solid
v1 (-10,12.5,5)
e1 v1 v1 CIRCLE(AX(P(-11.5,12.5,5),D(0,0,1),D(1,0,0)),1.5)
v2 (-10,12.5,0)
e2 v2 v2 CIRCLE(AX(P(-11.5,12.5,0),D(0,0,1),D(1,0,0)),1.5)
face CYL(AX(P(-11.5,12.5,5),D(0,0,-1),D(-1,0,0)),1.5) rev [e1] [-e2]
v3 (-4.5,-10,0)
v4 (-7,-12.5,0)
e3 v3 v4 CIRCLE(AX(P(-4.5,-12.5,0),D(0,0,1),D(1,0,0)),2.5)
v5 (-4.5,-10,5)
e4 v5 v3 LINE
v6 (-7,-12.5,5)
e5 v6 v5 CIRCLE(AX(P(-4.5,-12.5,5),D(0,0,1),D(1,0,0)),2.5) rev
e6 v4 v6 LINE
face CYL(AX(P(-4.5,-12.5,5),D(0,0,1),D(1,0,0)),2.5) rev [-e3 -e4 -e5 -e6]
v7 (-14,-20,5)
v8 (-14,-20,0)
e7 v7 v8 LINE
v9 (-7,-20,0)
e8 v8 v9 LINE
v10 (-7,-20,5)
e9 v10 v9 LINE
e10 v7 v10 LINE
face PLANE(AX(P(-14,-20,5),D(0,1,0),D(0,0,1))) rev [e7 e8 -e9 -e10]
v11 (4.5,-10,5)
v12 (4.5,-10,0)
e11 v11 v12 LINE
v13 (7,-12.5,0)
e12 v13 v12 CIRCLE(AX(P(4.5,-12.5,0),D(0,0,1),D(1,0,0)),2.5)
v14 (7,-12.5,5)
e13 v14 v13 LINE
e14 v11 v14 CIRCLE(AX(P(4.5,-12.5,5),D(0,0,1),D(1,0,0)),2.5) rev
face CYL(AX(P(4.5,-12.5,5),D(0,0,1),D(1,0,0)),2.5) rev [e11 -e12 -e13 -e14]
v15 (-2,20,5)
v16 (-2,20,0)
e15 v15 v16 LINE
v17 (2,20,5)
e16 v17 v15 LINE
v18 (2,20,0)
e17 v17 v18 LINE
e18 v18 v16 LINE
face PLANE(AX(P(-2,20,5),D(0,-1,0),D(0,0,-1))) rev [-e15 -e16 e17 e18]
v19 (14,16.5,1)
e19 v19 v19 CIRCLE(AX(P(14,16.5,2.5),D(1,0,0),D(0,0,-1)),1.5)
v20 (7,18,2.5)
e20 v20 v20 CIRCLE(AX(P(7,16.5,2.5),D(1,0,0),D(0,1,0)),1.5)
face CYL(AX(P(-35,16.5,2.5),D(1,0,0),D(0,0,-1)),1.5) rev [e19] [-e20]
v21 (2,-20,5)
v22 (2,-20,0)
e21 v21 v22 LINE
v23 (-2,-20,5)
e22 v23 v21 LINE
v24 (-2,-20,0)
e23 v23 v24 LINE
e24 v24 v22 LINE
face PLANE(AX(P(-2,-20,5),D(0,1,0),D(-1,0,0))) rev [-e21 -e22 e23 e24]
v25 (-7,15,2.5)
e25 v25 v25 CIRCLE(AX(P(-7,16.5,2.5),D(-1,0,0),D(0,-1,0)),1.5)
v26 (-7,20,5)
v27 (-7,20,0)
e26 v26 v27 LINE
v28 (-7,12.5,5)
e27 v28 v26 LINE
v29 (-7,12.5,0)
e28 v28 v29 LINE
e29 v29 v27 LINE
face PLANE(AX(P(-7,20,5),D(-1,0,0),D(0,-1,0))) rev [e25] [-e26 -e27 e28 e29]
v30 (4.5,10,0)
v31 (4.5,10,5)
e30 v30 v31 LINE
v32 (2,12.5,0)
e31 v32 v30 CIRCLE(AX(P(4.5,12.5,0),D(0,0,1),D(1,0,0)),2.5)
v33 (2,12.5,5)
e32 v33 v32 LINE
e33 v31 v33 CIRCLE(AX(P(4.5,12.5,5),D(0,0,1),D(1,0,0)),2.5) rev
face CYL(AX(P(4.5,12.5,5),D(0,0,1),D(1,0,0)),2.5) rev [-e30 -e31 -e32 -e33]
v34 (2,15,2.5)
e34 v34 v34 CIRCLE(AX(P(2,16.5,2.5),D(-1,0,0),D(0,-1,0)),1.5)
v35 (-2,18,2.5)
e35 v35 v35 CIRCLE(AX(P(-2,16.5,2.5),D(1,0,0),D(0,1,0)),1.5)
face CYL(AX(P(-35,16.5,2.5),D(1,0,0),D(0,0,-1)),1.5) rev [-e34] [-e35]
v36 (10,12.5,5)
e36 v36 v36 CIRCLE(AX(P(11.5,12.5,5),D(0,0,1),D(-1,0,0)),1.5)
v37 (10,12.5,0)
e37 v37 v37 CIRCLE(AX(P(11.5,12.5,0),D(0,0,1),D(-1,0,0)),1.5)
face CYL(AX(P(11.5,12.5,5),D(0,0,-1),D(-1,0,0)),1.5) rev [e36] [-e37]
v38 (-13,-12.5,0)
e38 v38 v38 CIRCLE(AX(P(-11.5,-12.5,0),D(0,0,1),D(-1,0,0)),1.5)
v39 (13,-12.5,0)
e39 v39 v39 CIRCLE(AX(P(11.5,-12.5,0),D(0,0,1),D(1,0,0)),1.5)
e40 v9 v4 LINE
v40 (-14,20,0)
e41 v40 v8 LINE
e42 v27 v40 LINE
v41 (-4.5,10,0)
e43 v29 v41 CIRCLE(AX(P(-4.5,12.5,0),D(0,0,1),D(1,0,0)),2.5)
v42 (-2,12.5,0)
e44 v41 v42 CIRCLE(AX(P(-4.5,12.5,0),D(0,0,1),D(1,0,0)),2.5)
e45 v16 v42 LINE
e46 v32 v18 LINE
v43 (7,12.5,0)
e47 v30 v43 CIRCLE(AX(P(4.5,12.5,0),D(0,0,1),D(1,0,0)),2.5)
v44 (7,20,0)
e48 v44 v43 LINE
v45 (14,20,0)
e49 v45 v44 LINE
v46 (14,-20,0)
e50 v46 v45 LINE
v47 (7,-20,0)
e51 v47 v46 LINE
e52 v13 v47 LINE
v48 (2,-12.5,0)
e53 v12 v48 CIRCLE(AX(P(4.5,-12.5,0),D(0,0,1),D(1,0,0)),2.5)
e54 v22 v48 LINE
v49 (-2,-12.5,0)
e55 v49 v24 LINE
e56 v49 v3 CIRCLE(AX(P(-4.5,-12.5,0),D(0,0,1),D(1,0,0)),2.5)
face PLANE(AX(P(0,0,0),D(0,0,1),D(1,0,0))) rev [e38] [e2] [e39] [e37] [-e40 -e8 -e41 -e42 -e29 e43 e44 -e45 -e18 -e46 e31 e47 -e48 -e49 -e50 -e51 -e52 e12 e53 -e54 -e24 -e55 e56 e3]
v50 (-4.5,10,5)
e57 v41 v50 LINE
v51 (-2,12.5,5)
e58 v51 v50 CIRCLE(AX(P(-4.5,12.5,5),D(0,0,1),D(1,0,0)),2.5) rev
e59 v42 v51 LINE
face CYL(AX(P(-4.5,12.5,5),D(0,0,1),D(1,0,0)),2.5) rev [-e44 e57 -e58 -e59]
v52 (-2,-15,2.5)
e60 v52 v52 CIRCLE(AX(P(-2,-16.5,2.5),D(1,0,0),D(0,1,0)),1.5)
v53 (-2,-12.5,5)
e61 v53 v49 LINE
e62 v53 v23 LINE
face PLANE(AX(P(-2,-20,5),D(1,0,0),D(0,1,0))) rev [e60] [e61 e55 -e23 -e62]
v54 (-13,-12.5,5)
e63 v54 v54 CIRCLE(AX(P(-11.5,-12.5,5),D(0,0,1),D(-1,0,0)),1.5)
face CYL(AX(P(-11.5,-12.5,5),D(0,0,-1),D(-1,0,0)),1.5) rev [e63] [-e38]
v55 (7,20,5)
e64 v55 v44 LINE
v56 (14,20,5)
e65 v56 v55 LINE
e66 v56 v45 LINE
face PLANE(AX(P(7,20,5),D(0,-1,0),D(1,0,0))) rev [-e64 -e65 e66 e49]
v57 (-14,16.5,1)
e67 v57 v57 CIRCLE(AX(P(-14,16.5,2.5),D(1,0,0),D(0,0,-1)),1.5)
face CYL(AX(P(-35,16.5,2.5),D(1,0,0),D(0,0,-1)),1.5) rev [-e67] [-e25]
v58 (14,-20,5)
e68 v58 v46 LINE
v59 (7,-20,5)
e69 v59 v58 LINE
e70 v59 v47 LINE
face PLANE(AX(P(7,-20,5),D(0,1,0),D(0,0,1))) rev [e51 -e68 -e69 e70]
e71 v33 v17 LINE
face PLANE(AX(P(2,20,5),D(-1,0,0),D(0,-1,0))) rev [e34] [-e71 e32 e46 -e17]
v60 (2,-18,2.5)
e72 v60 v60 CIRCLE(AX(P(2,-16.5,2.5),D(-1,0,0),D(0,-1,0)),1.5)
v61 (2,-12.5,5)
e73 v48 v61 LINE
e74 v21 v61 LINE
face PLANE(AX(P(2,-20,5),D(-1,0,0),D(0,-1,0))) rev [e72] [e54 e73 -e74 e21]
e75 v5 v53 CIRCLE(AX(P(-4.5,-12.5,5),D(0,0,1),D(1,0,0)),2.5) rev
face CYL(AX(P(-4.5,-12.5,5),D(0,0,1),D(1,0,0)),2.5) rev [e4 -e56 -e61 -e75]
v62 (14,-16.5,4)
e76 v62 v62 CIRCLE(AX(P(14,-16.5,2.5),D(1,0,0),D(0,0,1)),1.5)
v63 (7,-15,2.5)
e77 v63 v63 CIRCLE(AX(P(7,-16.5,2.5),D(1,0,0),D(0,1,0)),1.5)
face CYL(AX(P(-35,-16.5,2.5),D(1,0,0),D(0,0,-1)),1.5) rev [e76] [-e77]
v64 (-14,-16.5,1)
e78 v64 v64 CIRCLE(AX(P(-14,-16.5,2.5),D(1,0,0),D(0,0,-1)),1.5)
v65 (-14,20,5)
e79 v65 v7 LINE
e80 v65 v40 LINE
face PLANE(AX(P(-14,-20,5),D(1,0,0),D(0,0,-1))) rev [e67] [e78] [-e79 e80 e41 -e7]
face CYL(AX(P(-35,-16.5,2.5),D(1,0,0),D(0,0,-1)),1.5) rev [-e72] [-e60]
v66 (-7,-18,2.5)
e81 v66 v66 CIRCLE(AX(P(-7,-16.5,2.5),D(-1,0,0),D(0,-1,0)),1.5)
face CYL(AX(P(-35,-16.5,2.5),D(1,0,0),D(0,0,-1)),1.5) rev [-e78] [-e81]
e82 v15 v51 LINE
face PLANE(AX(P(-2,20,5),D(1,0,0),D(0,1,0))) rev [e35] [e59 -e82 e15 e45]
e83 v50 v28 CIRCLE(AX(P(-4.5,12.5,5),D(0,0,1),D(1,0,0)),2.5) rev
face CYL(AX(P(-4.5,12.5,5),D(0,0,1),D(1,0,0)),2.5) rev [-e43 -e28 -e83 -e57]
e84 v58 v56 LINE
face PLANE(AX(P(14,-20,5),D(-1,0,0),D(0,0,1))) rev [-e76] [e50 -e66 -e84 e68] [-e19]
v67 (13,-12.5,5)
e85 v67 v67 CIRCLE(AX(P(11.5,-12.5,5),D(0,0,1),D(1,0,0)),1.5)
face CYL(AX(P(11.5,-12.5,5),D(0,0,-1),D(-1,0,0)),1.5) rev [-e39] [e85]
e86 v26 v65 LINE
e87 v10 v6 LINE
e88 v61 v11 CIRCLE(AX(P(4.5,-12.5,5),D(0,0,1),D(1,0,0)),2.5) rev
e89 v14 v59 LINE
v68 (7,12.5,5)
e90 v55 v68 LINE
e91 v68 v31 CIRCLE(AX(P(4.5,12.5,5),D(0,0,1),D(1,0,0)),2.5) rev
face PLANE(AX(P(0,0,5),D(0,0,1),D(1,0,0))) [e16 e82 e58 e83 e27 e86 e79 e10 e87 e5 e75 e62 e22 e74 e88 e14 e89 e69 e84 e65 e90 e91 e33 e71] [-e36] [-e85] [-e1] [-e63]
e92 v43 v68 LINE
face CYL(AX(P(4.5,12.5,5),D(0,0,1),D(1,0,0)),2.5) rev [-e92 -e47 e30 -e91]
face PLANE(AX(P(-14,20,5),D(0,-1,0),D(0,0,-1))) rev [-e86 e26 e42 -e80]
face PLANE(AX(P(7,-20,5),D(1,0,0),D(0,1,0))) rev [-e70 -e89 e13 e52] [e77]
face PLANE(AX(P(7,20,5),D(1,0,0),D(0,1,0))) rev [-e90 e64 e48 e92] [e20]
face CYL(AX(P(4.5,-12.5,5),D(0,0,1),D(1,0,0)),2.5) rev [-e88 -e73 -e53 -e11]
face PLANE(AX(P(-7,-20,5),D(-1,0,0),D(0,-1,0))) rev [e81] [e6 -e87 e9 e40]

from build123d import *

# Parameters (mm, degrees)
SKETCH_1_R          = 1.5
EXTRUDE_1_DEPTH     = 5
FILLET_1_R          = 2.5
SKETCH_3_R          = 1.5
CUT_EXTRUDE_1_DEPTH = 49


with BuildPart() as part:
    # 草图1 → 凸台-拉伸1 (new body)
    with BuildSketch(Plane.XY):
        Polygon((-14, -20), (-7, -20), (-7, -10), (-2, -10), (-2, -20), (2, -20), (2, -10), (7, -10), (7, -20), (14, -20), (14, 20), (7, 20), (7, 10), (2, 10), (2, 20), (-2, 20), (-2, 10), (-7, 10), (-7, 20), (-14, 20), align=None)
        with Locations((-11.5, 12.5)):
            Circle(SKETCH_1_R, mode=Mode.SUBTRACT)
        with Locations(Location((11.5, 12.5, 0), (0, 0, 180))):
            Circle(SKETCH_1_R, mode=Mode.SUBTRACT)
        with Locations((11.5, -12.5)):
            Circle(SKETCH_1_R, mode=Mode.SUBTRACT)
        with Locations(Location((-11.5, -12.5, 0), (0, 0, 180))):
            Circle(SKETCH_1_R, mode=Mode.SUBTRACT)
    extrude(amount=EXTRUDE_1_DEPTH)

    # 圆角1
    fillet_1_edges = [part.edges().sort_by_distance(p)[0] for p in [
        (7, -10, 2.5),
        (2, -10, 2.5),
        (-2, -10, 2.5),
        (-7, -10, 2.5),
        (7, 10, 2.5),
        (2, 10, 2.5),
        (-2, 10, 2.5),
        (-7, 10, 2.5),
    ]]
    fillet(fillet_1_edges, radius=FILLET_1_R - 0.0001)  # a hair under: the kernel refuses the full size

    # 草图3 → 切除-拉伸1 (cut)
    with BuildSketch(Plane(origin=(14, 0, 0), x_dir=(0, 0, -1), z_dir=(1, 0, 0))):
        with Locations((-2.5, 16.5)):
            Circle(SKETCH_3_R)
        with Locations(Location((-2.5, -16.5, 0), (0, 0, 90))):
            Circle(SKETCH_3_R)
    extrude(amount=-CUT_EXTRUDE_1_DEPTH, mode=Mode.SUBTRACT)


solid = part.part
